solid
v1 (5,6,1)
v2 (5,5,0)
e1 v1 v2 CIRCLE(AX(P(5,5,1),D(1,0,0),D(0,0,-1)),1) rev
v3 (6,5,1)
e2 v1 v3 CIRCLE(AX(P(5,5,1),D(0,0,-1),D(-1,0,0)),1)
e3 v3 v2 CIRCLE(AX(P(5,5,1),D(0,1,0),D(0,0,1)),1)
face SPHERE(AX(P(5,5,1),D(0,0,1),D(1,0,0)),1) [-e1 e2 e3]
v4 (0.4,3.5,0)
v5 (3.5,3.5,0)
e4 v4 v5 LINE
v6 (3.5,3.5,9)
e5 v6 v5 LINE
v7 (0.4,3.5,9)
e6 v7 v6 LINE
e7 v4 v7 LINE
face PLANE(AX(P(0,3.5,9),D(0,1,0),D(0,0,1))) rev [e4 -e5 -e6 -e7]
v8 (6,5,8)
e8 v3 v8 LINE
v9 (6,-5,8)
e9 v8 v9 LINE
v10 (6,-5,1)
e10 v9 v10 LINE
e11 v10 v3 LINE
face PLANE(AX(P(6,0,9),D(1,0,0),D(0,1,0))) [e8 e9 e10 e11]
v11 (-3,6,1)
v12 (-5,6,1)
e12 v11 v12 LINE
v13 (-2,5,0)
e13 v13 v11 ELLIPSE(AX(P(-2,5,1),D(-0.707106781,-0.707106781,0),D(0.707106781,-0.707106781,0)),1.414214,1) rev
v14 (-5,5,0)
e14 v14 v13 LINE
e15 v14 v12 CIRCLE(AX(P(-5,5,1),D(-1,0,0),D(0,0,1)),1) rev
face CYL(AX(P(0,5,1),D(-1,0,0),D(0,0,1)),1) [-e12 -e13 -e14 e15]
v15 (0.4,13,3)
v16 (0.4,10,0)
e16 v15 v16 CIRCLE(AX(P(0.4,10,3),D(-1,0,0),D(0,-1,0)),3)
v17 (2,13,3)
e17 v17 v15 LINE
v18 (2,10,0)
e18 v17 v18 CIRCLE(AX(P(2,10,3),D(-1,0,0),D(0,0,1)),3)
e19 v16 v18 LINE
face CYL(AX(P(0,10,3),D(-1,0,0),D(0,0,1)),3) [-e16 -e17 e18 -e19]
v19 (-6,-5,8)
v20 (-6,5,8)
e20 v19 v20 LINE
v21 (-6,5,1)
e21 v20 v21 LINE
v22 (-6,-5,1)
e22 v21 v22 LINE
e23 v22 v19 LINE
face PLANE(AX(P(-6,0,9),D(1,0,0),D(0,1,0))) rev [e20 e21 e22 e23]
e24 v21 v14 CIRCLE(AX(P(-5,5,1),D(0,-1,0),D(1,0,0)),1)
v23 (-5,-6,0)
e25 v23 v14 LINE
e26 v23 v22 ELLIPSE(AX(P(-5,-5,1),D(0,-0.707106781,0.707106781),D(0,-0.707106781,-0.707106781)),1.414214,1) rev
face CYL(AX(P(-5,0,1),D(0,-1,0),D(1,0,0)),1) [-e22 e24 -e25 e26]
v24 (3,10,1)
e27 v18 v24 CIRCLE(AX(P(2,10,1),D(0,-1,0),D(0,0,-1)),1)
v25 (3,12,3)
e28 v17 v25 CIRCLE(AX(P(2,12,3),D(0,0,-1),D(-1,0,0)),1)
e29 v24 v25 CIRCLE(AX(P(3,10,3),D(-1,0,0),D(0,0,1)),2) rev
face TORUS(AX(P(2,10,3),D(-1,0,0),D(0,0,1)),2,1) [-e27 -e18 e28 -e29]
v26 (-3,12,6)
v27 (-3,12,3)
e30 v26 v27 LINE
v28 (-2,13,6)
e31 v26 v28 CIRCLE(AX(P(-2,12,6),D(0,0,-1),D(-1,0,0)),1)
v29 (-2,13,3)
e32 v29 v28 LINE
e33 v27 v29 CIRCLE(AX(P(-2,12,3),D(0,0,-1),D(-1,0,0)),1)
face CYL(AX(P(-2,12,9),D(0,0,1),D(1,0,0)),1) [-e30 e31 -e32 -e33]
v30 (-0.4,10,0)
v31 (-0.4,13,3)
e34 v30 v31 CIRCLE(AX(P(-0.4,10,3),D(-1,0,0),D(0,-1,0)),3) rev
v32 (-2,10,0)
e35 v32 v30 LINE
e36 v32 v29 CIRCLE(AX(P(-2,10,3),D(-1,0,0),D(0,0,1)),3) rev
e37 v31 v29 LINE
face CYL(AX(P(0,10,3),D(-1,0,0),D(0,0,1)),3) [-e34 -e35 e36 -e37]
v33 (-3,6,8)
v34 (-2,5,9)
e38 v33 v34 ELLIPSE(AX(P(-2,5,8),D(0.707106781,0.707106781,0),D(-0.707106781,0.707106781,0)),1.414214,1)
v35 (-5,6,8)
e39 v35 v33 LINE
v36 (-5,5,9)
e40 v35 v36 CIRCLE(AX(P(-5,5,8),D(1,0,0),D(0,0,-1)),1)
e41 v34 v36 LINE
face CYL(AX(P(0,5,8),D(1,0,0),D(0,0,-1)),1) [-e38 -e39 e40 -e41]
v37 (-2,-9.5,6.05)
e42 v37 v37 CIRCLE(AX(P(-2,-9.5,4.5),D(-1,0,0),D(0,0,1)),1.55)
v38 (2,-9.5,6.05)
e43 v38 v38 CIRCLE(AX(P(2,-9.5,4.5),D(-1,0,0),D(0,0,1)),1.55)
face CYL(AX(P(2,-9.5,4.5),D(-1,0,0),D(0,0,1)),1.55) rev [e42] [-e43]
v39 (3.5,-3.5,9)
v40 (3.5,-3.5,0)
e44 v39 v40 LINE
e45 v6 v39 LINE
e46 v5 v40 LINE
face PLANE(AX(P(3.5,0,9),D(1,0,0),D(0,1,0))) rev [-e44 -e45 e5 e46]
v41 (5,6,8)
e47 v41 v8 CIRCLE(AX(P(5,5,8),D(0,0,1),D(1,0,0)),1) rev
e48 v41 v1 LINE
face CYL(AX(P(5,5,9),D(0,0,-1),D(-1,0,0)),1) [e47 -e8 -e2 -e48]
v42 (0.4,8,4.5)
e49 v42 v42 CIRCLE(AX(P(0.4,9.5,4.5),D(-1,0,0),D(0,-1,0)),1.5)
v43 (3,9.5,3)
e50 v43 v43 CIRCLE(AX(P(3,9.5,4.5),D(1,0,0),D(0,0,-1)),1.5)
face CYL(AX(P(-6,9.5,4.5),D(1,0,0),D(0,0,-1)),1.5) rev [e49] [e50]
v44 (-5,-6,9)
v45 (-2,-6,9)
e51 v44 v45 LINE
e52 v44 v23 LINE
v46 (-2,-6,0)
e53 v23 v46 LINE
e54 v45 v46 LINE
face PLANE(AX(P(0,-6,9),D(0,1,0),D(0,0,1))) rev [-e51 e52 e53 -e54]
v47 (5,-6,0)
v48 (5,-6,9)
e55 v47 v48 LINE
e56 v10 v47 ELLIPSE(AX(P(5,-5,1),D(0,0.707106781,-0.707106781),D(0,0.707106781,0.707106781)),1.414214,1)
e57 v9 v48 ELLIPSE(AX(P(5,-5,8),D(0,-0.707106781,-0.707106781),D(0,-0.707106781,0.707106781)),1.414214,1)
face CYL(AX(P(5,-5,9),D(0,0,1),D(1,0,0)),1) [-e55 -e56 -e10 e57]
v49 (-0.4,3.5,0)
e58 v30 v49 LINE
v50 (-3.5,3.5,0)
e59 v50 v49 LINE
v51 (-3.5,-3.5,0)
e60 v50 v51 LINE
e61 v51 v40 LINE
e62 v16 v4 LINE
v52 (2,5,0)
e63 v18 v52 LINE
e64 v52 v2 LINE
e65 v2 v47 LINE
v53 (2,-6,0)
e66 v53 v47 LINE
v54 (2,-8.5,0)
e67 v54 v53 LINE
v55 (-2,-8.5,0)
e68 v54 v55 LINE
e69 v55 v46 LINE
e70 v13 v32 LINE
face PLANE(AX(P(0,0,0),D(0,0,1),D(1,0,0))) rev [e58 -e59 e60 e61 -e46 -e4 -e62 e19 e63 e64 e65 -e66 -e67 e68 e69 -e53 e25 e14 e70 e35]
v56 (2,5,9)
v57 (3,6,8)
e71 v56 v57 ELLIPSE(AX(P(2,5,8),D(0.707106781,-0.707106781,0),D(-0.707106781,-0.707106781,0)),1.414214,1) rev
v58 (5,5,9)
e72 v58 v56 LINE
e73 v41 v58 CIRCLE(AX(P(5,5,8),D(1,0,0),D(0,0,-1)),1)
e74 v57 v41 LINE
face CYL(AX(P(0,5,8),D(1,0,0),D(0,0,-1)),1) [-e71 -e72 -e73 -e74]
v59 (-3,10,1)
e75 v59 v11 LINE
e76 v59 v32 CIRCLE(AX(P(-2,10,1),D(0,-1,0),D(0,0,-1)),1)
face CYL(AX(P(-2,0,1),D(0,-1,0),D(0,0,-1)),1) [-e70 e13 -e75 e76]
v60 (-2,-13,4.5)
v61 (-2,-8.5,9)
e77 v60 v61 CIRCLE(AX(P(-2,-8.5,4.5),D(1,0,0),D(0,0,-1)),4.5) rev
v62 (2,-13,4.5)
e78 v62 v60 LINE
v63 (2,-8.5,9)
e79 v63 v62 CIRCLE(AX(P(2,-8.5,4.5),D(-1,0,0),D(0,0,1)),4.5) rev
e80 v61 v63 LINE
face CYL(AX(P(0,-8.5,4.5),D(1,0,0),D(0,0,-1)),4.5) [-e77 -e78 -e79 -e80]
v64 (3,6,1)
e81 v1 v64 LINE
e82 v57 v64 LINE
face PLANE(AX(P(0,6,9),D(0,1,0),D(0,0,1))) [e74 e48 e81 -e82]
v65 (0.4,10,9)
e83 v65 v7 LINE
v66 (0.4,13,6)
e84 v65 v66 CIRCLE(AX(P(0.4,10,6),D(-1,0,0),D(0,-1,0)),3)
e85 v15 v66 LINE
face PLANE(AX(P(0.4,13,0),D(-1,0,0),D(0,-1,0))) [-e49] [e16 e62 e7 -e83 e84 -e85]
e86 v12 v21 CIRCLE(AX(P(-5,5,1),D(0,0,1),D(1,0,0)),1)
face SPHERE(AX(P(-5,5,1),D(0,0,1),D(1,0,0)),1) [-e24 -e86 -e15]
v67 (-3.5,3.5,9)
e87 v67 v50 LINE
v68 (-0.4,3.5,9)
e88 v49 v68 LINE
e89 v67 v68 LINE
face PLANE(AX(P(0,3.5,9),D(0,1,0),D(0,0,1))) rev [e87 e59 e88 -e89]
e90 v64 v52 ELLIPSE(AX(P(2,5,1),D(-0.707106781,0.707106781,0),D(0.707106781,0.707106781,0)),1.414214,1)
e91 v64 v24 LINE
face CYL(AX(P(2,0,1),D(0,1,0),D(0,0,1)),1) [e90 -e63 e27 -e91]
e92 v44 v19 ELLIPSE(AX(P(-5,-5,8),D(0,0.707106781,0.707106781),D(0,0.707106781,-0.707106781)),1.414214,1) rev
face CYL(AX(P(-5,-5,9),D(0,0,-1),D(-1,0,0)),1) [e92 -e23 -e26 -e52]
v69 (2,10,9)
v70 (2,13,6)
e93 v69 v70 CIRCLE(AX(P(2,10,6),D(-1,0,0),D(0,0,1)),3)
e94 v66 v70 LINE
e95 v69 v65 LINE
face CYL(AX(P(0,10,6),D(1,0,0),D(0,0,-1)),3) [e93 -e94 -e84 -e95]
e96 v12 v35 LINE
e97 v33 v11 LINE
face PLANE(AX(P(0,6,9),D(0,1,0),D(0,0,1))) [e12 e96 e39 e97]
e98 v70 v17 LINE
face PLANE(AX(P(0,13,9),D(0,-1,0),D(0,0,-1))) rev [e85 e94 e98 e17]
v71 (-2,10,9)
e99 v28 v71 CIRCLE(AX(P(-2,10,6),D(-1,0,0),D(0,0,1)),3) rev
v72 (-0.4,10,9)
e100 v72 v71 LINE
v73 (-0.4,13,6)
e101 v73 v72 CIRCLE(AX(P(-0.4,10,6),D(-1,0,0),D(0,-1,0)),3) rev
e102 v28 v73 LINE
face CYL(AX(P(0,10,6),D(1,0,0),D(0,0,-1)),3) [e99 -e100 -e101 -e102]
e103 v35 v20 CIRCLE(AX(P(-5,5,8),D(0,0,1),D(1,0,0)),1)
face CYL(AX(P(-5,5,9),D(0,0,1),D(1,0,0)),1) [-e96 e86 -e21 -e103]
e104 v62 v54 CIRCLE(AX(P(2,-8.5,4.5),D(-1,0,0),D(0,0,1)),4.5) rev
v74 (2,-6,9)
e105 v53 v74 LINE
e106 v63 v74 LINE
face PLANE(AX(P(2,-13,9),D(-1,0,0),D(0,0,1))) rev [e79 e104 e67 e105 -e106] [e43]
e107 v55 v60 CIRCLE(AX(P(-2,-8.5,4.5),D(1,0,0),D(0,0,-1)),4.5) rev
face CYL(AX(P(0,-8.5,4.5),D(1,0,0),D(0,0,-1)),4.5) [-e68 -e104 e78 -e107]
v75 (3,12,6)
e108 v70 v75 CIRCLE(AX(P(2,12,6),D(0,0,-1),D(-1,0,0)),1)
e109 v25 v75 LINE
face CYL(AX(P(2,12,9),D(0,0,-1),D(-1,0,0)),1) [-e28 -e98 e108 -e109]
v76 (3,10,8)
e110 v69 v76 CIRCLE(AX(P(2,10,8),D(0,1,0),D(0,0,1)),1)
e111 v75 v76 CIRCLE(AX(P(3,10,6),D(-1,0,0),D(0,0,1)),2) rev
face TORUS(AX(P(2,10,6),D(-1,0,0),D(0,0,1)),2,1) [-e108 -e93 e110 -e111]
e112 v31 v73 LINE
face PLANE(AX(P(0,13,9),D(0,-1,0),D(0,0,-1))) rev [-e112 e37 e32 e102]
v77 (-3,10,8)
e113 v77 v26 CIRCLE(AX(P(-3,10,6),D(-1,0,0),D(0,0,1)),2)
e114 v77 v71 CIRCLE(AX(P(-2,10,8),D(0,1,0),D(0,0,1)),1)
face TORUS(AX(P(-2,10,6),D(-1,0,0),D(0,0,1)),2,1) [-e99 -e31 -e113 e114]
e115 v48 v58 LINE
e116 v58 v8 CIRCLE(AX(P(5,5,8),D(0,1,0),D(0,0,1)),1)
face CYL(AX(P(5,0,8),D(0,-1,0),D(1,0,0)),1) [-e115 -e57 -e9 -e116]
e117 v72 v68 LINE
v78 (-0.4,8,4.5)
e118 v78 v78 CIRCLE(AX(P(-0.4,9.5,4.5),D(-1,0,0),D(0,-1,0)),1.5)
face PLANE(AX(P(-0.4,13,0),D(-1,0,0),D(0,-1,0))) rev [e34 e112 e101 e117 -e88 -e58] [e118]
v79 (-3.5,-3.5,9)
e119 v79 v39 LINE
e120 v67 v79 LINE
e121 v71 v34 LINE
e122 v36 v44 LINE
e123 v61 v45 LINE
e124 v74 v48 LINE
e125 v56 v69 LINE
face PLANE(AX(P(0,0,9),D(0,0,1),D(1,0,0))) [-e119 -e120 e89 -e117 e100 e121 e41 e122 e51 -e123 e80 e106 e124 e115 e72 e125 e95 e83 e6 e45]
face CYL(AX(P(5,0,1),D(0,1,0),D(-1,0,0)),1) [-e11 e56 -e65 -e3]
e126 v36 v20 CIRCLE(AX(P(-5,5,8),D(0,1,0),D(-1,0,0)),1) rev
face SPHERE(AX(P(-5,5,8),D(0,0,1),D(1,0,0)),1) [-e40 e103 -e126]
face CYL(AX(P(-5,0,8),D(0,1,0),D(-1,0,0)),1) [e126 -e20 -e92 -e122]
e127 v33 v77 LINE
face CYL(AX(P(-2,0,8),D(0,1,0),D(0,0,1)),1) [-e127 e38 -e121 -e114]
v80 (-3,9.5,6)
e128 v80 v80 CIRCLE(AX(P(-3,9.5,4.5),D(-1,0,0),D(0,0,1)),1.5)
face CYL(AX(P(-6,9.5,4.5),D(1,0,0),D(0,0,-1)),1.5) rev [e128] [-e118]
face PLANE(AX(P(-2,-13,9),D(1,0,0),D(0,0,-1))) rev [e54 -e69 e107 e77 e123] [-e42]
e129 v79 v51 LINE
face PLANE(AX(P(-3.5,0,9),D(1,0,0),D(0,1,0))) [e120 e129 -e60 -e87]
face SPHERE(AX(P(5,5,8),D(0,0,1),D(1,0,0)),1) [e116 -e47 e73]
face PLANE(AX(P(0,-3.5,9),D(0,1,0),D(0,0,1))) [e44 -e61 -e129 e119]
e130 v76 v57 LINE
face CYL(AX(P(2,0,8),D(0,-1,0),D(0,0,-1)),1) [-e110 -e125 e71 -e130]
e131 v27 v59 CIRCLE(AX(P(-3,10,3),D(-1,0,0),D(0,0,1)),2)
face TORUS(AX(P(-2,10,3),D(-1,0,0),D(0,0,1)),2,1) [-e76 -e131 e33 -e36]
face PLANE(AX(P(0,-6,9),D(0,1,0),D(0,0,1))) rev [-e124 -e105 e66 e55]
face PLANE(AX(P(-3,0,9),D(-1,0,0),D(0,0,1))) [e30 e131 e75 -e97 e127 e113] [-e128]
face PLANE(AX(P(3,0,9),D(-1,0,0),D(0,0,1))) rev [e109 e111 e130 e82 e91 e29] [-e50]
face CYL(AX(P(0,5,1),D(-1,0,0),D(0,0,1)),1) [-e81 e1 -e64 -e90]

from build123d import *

# Parameters (mm, degrees)
SKETCH_1_W          = 3
SKETCH_1_H          = 7
SKETCH_1_W_2        = 12
SKETCH_1_H_2        = 12
SKETCH_1_W_3        = 7
SKETCH_1_W_4        = 5
EXTRUDE_1_DEPTH     = 9
CUT_EXTRUDE_1_DEPTH = 17.911534525
FILLET_2_R          = 3
SKETCH_4_R          = 1.5
CUT_EXTRUDE_3_DEPTH = 19.193405399
FILLET_3_R          = 1
FILLET_4_R          = 1
FILLET_5_R          = 1
SKETCH_5_W          = 5
SKETCH_5_H          = 7
CUT_EXTRUDE_4_DEPTH = 9
EXTRUDE_2_DEPTH     = 7
FILLET_6_R          = 4.5
SKETCH_7_R          = 1.55
CUT_EXTRUDE_5_DEPTH = 4


# Some blends are built 0.0001 mm under size
with BuildPart() as part:
    # 草图1 → 凸台-拉伸1 (new body)
    # profile 1 of 4: a face of its own
    with BuildSketch(Plane.XY):
        with Locations((-1.5, 9.5)):
            Rectangle(SKETCH_1_W, SKETCH_1_H)
    # profile 2 of 4: a face of its own
    with BuildSketch(Plane.XY):
        with Locations((1.5, 9.5)):
            Rectangle(SKETCH_1_W, SKETCH_1_H)
    # profile 3 of 4: a face of its own
    with BuildSketch(Plane.XY):
        Rectangle(SKETCH_1_W_2, SKETCH_1_H_2)
        Rectangle(SKETCH_1_W_3, SKETCH_1_H, mode=Mode.SUBTRACT)
    # profile 4 of 4: a face of its own
    with BuildSketch(Plane.XY):
        with Locations((1, -9.5)):
            Rectangle(SKETCH_1_W_4, SKETCH_1_H)
    extrude(amount=EXTRUDE_1_DEPTH)

    # 草图2 → 切除-拉伸1 (cut, through all)
    with BuildSketch(Plane.XY.offset(9)):
        Polygon((0, 13), (0.4, 13), (0.4, 3.5), (0, 3.5), (-0.4, 3.5), (-0.4, 13), align=None)
    extrude(amount=-CUT_EXTRUDE_1_DEPTH, mode=Mode.SUBTRACT)

    # 圆角2
    fillet_2_edges = [part.edges().sort_by_distance(p)[0] for p in [
        (1.7, 13, 9),
        (1.7, 13, 0),
        (-1.7, 13, 0),
        (-1.7, 13, 9),
    ]]
    fillet(fillet_2_edges, radius=FILLET_2_R)

    # 草图4 → 切除-拉伸3 (cut, through all)
    with BuildSketch(Plane(origin=(3, 0, 0), x_dir=(0, 0, -1), z_dir=(1, 0, 0))):
        with Locations((-4.5, 9.5)):
            Circle(SKETCH_4_R)
    extrude(amount=-CUT_EXTRUDE_3_DEPTH, mode=Mode.SUBTRACT)

    # 圆角3
    fillet_3_edges = [part.edges().sort_by_distance(p)[0] for p in [
        (3, 8, 9),
        (6, 0, 0),
        (3, 8, 0),
        (4.5, 6, 0),
        (6, 6, 4.5),
        (6, -6, 4.5),
        (4.5, 6, 9),
        (6, 0, 9),
        (3, 13, 4.5),
        (3, 12.121320344, 8.121320344),
        (3, 12.121320344, 0.878679656),
    ]]
    fillet(fillet_3_edges, radius=FILLET_3_R)

    # 圆角4
    fillet_4_edges = [part.edges().sort_by_distance(p)[0] for p in [
        (-3, 8, 9),
        (-6, 0, 0),
        (-4.5, 6, 0),
        (-3, 8, 0),
        (-4.5, 6, 9),
        (-6, 0, 9),
        (-6, -6, 4.5),
        (-3, 13, 4.5),
        (-3, 12.121320344, 8.121320344),
        (-3, 12.121320344, 0.878679656),
    ]]
    fillet(fillet_4_edges, radius=FILLET_4_R)

    # 圆角5
    # the kernel refuses this fillet: 1 mm, written as the material it takes off along each edge
    with BuildSketch(Plane(origin=(-5, 5, 8), x_dir=(0, 1, 0), z_dir=(-1, 0, 0))) as fillet_5_piece_1_section:
        Polygon((0, 0), (FILLET_5_R, 0), (FILLET_5_R, -FILLET_5_R), (0, -FILLET_5_R), align=None)
    fillet_5_piece_1 = extrude(amount=FILLET_5_R, mode=Mode.PRIVATE)
    fillet_5_piece_1 = fillet_5_piece_1 - Plane(origin=(-5, 5, 8), x_dir=(0, -0.7071067811865475, -0.7071067811865475), z_dir=(-1, 0, 0)) * Sphere(FILLET_5_R, mode=Mode.PRIVATE)
    add(fillet_5_piece_1, mode=Mode.SUBTRACT)
    with BuildSketch(Plane(origin=(-5, 5, 1), x_dir=(0, 1, 0), z_dir=(-1, 0, 0))) as fillet_5_piece_2_section:
        Polygon((0, 0), (FILLET_5_R, 0), (FILLET_5_R, FILLET_5_R), (0, FILLET_5_R), align=None)
    fillet_5_piece_2 = extrude(amount=FILLET_5_R, mode=Mode.PRIVATE)
    fillet_5_piece_2 = fillet_5_piece_2 - Plane(origin=(-5, 5, 1), x_dir=(0, -0.7071067811865475, 0.7071067811865475), z_dir=(-1, 0, 0)) * Sphere(FILLET_5_R, mode=Mode.PRIVATE)
    add(fillet_5_piece_2, mode=Mode.SUBTRACT)
    with BuildSketch(Plane(origin=(-6, 6, 1), x_dir=(0, -1, 0), z_dir=(0, 0, 1))) as fillet_5_piece_3:
        with BuildLine():
            CenterArc((FILLET_5_R, FILLET_5_R), FILLET_5_R, 180, 90)
            Line((0, FILLET_5_R), (0, 0))
            Line((0, 0), (FILLET_5_R, 0))
        make_face()
    extrude(amount=7, mode=Mode.SUBTRACT)

    # 草图5 → 切除-拉伸4 (cut)
    with BuildSketch(Plane.XY.offset(9)):
        with Locations((1, -9.5)):
            Rectangle(SKETCH_5_W, SKETCH_5_H)
    extrude(amount=-CUT_EXTRUDE_4_DEPTH, mode=Mode.SUBTRACT)

    # 草图6 → 凸台-拉伸2 (add)
    with BuildSketch(Plane.XZ.offset(6)):
        Polygon((0, 9), (-2, 9), (-2, 0), (0, 0), (2, 0), (2, 9), align=None)
    extrude(amount=EXTRUDE_2_DEPTH)

    # 圆角6
    fillet_6_edges = [part.edges().sort_by_distance(p)[0] for p in [
        (0, -13, 0),
        (0, -13, 9),
    ]]
    fillet(fillet_6_edges, radius=FILLET_6_R - 0.0001)  # a hair under: the kernel refuses the full size

    # 草图7 → 切除-拉伸5 (cut)
    with BuildSketch(Plane.ZY.offset(2)):
        with Locations((4.5, -9.5)):
            Circle(SKETCH_7_R)
    extrude(amount=-CUT_EXTRUDE_5_DEPTH, mode=Mode.SUBTRACT)


solid = part.part
